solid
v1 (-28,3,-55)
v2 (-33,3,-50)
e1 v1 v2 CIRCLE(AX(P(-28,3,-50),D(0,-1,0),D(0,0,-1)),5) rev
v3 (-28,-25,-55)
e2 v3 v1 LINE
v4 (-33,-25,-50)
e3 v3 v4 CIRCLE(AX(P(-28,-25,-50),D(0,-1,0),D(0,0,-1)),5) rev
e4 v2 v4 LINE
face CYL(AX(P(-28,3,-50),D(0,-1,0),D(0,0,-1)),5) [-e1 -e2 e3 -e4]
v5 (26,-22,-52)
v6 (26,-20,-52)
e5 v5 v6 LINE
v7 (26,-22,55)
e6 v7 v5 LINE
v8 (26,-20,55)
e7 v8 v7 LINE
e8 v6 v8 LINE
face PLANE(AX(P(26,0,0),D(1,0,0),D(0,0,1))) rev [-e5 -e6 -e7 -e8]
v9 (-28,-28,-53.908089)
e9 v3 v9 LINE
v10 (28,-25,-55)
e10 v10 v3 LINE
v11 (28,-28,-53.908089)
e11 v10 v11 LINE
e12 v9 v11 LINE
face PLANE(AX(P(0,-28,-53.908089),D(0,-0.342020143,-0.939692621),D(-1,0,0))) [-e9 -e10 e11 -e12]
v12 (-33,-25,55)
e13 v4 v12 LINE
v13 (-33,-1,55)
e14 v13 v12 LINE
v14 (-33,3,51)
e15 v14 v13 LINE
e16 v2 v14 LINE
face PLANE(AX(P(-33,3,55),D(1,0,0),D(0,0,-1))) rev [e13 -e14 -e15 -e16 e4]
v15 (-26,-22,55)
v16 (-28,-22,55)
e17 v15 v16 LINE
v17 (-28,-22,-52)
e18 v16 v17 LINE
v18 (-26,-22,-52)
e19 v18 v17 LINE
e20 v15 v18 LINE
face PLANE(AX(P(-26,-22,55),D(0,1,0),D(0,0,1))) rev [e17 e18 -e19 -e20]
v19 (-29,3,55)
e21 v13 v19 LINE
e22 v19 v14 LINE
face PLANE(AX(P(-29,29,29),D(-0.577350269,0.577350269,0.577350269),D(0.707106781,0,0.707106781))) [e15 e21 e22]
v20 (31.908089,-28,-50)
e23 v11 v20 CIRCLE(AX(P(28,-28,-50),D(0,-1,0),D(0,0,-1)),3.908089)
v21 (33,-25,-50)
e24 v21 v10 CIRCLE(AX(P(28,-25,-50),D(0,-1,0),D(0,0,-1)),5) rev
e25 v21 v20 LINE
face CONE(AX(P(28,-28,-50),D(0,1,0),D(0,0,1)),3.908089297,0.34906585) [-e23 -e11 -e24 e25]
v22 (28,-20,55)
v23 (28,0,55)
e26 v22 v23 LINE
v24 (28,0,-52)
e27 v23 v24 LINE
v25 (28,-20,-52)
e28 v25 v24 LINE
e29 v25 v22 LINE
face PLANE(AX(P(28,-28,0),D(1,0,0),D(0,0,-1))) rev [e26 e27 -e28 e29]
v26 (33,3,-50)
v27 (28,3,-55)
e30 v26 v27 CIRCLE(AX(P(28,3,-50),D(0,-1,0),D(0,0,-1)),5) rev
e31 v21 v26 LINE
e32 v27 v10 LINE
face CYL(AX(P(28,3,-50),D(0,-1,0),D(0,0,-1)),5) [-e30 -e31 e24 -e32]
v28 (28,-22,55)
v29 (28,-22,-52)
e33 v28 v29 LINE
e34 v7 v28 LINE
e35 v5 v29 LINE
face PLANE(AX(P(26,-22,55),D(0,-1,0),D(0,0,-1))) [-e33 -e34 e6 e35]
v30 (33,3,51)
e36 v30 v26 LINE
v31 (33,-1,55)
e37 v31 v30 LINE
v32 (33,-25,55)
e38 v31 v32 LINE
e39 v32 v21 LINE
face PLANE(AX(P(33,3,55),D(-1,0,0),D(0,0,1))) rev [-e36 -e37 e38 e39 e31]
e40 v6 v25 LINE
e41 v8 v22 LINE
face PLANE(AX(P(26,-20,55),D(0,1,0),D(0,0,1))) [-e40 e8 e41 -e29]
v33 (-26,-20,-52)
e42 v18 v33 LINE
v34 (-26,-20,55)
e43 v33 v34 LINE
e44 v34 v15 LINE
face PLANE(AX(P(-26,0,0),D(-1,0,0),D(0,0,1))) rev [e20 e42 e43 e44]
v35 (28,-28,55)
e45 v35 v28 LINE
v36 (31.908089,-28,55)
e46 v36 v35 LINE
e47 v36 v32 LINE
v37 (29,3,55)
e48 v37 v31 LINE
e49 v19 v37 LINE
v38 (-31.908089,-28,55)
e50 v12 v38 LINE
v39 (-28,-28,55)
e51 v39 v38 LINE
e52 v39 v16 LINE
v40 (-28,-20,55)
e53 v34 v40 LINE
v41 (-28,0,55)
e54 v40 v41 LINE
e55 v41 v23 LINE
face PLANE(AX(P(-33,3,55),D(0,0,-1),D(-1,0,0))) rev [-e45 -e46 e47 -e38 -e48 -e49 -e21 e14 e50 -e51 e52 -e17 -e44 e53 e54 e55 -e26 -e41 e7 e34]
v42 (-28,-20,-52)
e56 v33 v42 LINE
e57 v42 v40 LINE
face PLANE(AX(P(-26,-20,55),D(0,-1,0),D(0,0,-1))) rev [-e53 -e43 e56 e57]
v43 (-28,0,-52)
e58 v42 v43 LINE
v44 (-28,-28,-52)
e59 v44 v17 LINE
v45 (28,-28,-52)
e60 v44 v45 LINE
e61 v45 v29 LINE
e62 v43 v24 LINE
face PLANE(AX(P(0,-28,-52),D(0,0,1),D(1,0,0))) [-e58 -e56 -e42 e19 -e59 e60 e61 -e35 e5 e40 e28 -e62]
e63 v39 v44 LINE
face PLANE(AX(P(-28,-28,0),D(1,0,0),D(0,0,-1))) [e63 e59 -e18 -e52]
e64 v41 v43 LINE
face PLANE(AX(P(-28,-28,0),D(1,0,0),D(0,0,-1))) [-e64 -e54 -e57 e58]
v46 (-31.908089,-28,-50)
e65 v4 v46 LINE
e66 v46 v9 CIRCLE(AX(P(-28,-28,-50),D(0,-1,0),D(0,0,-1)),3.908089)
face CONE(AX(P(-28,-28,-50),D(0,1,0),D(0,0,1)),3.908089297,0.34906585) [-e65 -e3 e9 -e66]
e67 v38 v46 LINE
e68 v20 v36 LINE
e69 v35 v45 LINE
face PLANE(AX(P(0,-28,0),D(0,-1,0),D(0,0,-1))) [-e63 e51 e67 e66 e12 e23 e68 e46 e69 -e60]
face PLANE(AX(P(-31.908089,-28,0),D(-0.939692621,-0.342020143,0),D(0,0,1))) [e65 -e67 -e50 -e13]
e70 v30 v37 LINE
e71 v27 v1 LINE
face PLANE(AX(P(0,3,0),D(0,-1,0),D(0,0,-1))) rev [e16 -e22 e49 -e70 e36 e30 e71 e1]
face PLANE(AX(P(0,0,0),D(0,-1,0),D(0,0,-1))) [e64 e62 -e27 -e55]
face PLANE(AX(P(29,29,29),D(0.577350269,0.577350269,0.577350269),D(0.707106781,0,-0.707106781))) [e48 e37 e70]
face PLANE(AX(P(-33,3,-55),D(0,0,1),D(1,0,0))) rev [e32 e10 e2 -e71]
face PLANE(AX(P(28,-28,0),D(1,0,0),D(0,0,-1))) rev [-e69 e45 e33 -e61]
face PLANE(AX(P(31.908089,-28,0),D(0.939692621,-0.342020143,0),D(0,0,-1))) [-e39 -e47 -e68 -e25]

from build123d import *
from OCP.BRepFilletAPI import BRepFilletAPI_MakeChamfer

# Parameters (mm, degrees)
CROQUIS1_W              = 66
CROQUIS1_H              = 110
SALIENTE_EXTRUIR1_DEPTH = 3
SALIENTE_EXTRUIR2_DEPTH = 28
CROQUIS3_W              = 107
CROQUIS3_H              = 2
SALIENTE_EXTRUIR3_DEPTH = 2
REDONDEO1_R             = 5
CHAFL_N1_SIZE           = 3
CHAFL_N1_SIZE2          = 1.091910703
CHAFL_N2_START          = -54
CHAFL_N2_OUTLINE_W      = 7
CHAFL_N2_OUTLINE_H      = 9
CHAFL_N2_DEPTH          = 3.770526581
CHAFL_N3_START          = 50.229473419
CHAFL_N3_OUTLINE_W      = 8
CHAFL_N3_OUTLINE_H      = 9
CHAFL_N3_DEPTH          = 3.770526581


with BuildPart() as part:
    # Croquis1 → Saliente-Extruir1 (new body)
    with BuildSketch(Plane(origin=(0, 0, 0), x_dir=(1, 0, 0), z_dir=(0, 1, 0))):
        Rectangle(CROQUIS1_W, CROQUIS1_H)
    extrude(amount=SALIENTE_EXTRUIR1_DEPTH)

    # Croquis2 → Saliente-Extruir2 (add)
    with BuildSketch(Plane.XZ):
        Polygon((-28, 55), (-33, 55), (-33, -49.5), (-33, -55), (-28, -55), (28, -55), (33, -55), (33, -52), (33, 55), (28, 55), (28, -52), (-28, -52), align=None)
    extrude(amount=SALIENTE_EXTRUIR2_DEPTH)

    # Croquis3 → Saliente-Extruir3 (add)
    with BuildSketch(Plane(origin=(-28, 0, 0), x_dir=(0, 0, -1), z_dir=(1, 0, 0))):
        with Locations((-1.5, -21)):
            Rectangle(CROQUIS3_W, CROQUIS3_H)
    saliente_extruir3 = extrude(amount=SALIENTE_EXTRUIR3_DEPTH)

    # Simetría1: Saliente-Extruir3 across plane
    add(saliente_extruir3.mirror(Plane(origin=(0, 0, 0), x_dir=(0, 0, 1), z_dir=(1, 0, 0))))

    # Redondeo1
    redondeo1_edges = [part.edges().sort_by_distance(p)[0] for p in [
        (-33, -12.5, -55),
        (33, -12.5, -55),
    ]]
    fillet(redondeo1_edges, radius=REDONDEO1_R)

    # Chaflán1: one chamfer whose edges measure the first distance from different faces: ONE call of the kernel's chamfer builder (chamfer() names one face for all edges)
    chafl_n1_edges_1 = [part.edges().sort_by_distance(p)[0] for p in [
        (-33, -28, 2.5),
    ]]
    chafl_n1_side_1 = [part.faces().sort_by_distance(p)[0] for p in [
        (-33, -12.5, 2.5),
    ]]
    chafl_n1_edges_2 = [part.edges().sort_by_distance(p)[0] for p in [
        (0, -28, -55),
    ]]
    chafl_n1_side_2 = [part.faces().sort_by_distance(p)[0] for p in [
        (0, -12.5, -55),
    ]]
    chafl_n1_edges_3 = [part.edges().sort_by_distance(p)[0] for p in [
        (33, -28, 2.5),
    ]]
    chafl_n1_side_3 = [part.faces().sort_by_distance(p)[0] for p in [
        (33, -12.5, 2.5),
    ]]
    chafl_n1_edges_4 = [part.edges().sort_by_distance(p)[0] for p in [
        (31.535533906, -28, -53.535533906),
    ]]
    chafl_n1_side_4 = [part.faces().sort_by_distance(p)[0] for p in [
        (31.535533906, -12.5, -53.535533906),
    ]]
    chafl_n1_edges_5 = [part.edges().sort_by_distance(p)[0] for p in [
        (-31.535533906, -28, -53.535533906),
    ]]
    chafl_n1_side_5 = [part.faces().sort_by_distance(p)[0] for p in [
        (-31.535533906, -12.5, -53.535533906),
    ]]
    chafl_n1 = BRepFilletAPI_MakeChamfer(part.part.solid().wrapped)
    for e in chafl_n1_edges_1:
        chafl_n1.Add(CHAFL_N1_SIZE, CHAFL_N1_SIZE2, e.wrapped, chafl_n1_side_1[0].wrapped)  # the first distance lies on this face
    for e in chafl_n1_edges_2:
        chafl_n1.Add(CHAFL_N1_SIZE, CHAFL_N1_SIZE2, e.wrapped, chafl_n1_side_2[0].wrapped)  # the first distance lies on this face
    for e in chafl_n1_edges_3:
        chafl_n1.Add(CHAFL_N1_SIZE, CHAFL_N1_SIZE2, e.wrapped, chafl_n1_side_3[0].wrapped)  # the first distance lies on this face
    for e in chafl_n1_edges_4:
        chafl_n1.Add(CHAFL_N1_SIZE, CHAFL_N1_SIZE2, e.wrapped, chafl_n1_side_4[0].wrapped)  # the first distance lies on this face
    for e in chafl_n1_edges_5:
        chafl_n1.Add(CHAFL_N1_SIZE, CHAFL_N1_SIZE2, e.wrapped, chafl_n1_side_5[0].wrapped)  # the first distance lies on this face
    add(Compound.cast(chafl_n1.Shape()), mode=Mode.REPLACE)

    # Chaflán2: read off the stored shape, not the designer's step
    # Chaflán2 outline → Chaflán2 (cut)
    with BuildSketch(Plane(origin=(0, 0, 0), x_dir=(0.8164965809277258, 0.40824829046386313, 0.40824829046386313), z_dir=(0.5773502691896258, -0.5773502691896258, -0.5773502691896258)).offset(CHAFL_N2_START)):
        with Locations((-2.5, 36.5)):
            Rectangle(CHAFL_N2_OUTLINE_W, CHAFL_N2_OUTLINE_H)
    extrude(amount=CHAFL_N2_DEPTH, mode=Mode.SUBTRACT)

    # Chaflán3: read off the stored shape, not the designer's step
    # Chaflán3 outline → Chaflán3 (cut)
    with BuildSketch(Plane(origin=(0, 0, 0), x_dir=(0.8164965809277258, -0.40824829046386313, -0.40824829046386313), z_dir=(0.5773502691896258, 0.5773502691896258, 0.5773502691896258)).offset(CHAFL_N3_START)):
        with Locations((2, -36.5)):
            Rectangle(CHAFL_N3_OUTLINE_W, CHAFL_N3_OUTLINE_H)
    extrude(amount=CHAFL_N3_DEPTH, mode=Mode.SUBTRACT)


solid = part.part
